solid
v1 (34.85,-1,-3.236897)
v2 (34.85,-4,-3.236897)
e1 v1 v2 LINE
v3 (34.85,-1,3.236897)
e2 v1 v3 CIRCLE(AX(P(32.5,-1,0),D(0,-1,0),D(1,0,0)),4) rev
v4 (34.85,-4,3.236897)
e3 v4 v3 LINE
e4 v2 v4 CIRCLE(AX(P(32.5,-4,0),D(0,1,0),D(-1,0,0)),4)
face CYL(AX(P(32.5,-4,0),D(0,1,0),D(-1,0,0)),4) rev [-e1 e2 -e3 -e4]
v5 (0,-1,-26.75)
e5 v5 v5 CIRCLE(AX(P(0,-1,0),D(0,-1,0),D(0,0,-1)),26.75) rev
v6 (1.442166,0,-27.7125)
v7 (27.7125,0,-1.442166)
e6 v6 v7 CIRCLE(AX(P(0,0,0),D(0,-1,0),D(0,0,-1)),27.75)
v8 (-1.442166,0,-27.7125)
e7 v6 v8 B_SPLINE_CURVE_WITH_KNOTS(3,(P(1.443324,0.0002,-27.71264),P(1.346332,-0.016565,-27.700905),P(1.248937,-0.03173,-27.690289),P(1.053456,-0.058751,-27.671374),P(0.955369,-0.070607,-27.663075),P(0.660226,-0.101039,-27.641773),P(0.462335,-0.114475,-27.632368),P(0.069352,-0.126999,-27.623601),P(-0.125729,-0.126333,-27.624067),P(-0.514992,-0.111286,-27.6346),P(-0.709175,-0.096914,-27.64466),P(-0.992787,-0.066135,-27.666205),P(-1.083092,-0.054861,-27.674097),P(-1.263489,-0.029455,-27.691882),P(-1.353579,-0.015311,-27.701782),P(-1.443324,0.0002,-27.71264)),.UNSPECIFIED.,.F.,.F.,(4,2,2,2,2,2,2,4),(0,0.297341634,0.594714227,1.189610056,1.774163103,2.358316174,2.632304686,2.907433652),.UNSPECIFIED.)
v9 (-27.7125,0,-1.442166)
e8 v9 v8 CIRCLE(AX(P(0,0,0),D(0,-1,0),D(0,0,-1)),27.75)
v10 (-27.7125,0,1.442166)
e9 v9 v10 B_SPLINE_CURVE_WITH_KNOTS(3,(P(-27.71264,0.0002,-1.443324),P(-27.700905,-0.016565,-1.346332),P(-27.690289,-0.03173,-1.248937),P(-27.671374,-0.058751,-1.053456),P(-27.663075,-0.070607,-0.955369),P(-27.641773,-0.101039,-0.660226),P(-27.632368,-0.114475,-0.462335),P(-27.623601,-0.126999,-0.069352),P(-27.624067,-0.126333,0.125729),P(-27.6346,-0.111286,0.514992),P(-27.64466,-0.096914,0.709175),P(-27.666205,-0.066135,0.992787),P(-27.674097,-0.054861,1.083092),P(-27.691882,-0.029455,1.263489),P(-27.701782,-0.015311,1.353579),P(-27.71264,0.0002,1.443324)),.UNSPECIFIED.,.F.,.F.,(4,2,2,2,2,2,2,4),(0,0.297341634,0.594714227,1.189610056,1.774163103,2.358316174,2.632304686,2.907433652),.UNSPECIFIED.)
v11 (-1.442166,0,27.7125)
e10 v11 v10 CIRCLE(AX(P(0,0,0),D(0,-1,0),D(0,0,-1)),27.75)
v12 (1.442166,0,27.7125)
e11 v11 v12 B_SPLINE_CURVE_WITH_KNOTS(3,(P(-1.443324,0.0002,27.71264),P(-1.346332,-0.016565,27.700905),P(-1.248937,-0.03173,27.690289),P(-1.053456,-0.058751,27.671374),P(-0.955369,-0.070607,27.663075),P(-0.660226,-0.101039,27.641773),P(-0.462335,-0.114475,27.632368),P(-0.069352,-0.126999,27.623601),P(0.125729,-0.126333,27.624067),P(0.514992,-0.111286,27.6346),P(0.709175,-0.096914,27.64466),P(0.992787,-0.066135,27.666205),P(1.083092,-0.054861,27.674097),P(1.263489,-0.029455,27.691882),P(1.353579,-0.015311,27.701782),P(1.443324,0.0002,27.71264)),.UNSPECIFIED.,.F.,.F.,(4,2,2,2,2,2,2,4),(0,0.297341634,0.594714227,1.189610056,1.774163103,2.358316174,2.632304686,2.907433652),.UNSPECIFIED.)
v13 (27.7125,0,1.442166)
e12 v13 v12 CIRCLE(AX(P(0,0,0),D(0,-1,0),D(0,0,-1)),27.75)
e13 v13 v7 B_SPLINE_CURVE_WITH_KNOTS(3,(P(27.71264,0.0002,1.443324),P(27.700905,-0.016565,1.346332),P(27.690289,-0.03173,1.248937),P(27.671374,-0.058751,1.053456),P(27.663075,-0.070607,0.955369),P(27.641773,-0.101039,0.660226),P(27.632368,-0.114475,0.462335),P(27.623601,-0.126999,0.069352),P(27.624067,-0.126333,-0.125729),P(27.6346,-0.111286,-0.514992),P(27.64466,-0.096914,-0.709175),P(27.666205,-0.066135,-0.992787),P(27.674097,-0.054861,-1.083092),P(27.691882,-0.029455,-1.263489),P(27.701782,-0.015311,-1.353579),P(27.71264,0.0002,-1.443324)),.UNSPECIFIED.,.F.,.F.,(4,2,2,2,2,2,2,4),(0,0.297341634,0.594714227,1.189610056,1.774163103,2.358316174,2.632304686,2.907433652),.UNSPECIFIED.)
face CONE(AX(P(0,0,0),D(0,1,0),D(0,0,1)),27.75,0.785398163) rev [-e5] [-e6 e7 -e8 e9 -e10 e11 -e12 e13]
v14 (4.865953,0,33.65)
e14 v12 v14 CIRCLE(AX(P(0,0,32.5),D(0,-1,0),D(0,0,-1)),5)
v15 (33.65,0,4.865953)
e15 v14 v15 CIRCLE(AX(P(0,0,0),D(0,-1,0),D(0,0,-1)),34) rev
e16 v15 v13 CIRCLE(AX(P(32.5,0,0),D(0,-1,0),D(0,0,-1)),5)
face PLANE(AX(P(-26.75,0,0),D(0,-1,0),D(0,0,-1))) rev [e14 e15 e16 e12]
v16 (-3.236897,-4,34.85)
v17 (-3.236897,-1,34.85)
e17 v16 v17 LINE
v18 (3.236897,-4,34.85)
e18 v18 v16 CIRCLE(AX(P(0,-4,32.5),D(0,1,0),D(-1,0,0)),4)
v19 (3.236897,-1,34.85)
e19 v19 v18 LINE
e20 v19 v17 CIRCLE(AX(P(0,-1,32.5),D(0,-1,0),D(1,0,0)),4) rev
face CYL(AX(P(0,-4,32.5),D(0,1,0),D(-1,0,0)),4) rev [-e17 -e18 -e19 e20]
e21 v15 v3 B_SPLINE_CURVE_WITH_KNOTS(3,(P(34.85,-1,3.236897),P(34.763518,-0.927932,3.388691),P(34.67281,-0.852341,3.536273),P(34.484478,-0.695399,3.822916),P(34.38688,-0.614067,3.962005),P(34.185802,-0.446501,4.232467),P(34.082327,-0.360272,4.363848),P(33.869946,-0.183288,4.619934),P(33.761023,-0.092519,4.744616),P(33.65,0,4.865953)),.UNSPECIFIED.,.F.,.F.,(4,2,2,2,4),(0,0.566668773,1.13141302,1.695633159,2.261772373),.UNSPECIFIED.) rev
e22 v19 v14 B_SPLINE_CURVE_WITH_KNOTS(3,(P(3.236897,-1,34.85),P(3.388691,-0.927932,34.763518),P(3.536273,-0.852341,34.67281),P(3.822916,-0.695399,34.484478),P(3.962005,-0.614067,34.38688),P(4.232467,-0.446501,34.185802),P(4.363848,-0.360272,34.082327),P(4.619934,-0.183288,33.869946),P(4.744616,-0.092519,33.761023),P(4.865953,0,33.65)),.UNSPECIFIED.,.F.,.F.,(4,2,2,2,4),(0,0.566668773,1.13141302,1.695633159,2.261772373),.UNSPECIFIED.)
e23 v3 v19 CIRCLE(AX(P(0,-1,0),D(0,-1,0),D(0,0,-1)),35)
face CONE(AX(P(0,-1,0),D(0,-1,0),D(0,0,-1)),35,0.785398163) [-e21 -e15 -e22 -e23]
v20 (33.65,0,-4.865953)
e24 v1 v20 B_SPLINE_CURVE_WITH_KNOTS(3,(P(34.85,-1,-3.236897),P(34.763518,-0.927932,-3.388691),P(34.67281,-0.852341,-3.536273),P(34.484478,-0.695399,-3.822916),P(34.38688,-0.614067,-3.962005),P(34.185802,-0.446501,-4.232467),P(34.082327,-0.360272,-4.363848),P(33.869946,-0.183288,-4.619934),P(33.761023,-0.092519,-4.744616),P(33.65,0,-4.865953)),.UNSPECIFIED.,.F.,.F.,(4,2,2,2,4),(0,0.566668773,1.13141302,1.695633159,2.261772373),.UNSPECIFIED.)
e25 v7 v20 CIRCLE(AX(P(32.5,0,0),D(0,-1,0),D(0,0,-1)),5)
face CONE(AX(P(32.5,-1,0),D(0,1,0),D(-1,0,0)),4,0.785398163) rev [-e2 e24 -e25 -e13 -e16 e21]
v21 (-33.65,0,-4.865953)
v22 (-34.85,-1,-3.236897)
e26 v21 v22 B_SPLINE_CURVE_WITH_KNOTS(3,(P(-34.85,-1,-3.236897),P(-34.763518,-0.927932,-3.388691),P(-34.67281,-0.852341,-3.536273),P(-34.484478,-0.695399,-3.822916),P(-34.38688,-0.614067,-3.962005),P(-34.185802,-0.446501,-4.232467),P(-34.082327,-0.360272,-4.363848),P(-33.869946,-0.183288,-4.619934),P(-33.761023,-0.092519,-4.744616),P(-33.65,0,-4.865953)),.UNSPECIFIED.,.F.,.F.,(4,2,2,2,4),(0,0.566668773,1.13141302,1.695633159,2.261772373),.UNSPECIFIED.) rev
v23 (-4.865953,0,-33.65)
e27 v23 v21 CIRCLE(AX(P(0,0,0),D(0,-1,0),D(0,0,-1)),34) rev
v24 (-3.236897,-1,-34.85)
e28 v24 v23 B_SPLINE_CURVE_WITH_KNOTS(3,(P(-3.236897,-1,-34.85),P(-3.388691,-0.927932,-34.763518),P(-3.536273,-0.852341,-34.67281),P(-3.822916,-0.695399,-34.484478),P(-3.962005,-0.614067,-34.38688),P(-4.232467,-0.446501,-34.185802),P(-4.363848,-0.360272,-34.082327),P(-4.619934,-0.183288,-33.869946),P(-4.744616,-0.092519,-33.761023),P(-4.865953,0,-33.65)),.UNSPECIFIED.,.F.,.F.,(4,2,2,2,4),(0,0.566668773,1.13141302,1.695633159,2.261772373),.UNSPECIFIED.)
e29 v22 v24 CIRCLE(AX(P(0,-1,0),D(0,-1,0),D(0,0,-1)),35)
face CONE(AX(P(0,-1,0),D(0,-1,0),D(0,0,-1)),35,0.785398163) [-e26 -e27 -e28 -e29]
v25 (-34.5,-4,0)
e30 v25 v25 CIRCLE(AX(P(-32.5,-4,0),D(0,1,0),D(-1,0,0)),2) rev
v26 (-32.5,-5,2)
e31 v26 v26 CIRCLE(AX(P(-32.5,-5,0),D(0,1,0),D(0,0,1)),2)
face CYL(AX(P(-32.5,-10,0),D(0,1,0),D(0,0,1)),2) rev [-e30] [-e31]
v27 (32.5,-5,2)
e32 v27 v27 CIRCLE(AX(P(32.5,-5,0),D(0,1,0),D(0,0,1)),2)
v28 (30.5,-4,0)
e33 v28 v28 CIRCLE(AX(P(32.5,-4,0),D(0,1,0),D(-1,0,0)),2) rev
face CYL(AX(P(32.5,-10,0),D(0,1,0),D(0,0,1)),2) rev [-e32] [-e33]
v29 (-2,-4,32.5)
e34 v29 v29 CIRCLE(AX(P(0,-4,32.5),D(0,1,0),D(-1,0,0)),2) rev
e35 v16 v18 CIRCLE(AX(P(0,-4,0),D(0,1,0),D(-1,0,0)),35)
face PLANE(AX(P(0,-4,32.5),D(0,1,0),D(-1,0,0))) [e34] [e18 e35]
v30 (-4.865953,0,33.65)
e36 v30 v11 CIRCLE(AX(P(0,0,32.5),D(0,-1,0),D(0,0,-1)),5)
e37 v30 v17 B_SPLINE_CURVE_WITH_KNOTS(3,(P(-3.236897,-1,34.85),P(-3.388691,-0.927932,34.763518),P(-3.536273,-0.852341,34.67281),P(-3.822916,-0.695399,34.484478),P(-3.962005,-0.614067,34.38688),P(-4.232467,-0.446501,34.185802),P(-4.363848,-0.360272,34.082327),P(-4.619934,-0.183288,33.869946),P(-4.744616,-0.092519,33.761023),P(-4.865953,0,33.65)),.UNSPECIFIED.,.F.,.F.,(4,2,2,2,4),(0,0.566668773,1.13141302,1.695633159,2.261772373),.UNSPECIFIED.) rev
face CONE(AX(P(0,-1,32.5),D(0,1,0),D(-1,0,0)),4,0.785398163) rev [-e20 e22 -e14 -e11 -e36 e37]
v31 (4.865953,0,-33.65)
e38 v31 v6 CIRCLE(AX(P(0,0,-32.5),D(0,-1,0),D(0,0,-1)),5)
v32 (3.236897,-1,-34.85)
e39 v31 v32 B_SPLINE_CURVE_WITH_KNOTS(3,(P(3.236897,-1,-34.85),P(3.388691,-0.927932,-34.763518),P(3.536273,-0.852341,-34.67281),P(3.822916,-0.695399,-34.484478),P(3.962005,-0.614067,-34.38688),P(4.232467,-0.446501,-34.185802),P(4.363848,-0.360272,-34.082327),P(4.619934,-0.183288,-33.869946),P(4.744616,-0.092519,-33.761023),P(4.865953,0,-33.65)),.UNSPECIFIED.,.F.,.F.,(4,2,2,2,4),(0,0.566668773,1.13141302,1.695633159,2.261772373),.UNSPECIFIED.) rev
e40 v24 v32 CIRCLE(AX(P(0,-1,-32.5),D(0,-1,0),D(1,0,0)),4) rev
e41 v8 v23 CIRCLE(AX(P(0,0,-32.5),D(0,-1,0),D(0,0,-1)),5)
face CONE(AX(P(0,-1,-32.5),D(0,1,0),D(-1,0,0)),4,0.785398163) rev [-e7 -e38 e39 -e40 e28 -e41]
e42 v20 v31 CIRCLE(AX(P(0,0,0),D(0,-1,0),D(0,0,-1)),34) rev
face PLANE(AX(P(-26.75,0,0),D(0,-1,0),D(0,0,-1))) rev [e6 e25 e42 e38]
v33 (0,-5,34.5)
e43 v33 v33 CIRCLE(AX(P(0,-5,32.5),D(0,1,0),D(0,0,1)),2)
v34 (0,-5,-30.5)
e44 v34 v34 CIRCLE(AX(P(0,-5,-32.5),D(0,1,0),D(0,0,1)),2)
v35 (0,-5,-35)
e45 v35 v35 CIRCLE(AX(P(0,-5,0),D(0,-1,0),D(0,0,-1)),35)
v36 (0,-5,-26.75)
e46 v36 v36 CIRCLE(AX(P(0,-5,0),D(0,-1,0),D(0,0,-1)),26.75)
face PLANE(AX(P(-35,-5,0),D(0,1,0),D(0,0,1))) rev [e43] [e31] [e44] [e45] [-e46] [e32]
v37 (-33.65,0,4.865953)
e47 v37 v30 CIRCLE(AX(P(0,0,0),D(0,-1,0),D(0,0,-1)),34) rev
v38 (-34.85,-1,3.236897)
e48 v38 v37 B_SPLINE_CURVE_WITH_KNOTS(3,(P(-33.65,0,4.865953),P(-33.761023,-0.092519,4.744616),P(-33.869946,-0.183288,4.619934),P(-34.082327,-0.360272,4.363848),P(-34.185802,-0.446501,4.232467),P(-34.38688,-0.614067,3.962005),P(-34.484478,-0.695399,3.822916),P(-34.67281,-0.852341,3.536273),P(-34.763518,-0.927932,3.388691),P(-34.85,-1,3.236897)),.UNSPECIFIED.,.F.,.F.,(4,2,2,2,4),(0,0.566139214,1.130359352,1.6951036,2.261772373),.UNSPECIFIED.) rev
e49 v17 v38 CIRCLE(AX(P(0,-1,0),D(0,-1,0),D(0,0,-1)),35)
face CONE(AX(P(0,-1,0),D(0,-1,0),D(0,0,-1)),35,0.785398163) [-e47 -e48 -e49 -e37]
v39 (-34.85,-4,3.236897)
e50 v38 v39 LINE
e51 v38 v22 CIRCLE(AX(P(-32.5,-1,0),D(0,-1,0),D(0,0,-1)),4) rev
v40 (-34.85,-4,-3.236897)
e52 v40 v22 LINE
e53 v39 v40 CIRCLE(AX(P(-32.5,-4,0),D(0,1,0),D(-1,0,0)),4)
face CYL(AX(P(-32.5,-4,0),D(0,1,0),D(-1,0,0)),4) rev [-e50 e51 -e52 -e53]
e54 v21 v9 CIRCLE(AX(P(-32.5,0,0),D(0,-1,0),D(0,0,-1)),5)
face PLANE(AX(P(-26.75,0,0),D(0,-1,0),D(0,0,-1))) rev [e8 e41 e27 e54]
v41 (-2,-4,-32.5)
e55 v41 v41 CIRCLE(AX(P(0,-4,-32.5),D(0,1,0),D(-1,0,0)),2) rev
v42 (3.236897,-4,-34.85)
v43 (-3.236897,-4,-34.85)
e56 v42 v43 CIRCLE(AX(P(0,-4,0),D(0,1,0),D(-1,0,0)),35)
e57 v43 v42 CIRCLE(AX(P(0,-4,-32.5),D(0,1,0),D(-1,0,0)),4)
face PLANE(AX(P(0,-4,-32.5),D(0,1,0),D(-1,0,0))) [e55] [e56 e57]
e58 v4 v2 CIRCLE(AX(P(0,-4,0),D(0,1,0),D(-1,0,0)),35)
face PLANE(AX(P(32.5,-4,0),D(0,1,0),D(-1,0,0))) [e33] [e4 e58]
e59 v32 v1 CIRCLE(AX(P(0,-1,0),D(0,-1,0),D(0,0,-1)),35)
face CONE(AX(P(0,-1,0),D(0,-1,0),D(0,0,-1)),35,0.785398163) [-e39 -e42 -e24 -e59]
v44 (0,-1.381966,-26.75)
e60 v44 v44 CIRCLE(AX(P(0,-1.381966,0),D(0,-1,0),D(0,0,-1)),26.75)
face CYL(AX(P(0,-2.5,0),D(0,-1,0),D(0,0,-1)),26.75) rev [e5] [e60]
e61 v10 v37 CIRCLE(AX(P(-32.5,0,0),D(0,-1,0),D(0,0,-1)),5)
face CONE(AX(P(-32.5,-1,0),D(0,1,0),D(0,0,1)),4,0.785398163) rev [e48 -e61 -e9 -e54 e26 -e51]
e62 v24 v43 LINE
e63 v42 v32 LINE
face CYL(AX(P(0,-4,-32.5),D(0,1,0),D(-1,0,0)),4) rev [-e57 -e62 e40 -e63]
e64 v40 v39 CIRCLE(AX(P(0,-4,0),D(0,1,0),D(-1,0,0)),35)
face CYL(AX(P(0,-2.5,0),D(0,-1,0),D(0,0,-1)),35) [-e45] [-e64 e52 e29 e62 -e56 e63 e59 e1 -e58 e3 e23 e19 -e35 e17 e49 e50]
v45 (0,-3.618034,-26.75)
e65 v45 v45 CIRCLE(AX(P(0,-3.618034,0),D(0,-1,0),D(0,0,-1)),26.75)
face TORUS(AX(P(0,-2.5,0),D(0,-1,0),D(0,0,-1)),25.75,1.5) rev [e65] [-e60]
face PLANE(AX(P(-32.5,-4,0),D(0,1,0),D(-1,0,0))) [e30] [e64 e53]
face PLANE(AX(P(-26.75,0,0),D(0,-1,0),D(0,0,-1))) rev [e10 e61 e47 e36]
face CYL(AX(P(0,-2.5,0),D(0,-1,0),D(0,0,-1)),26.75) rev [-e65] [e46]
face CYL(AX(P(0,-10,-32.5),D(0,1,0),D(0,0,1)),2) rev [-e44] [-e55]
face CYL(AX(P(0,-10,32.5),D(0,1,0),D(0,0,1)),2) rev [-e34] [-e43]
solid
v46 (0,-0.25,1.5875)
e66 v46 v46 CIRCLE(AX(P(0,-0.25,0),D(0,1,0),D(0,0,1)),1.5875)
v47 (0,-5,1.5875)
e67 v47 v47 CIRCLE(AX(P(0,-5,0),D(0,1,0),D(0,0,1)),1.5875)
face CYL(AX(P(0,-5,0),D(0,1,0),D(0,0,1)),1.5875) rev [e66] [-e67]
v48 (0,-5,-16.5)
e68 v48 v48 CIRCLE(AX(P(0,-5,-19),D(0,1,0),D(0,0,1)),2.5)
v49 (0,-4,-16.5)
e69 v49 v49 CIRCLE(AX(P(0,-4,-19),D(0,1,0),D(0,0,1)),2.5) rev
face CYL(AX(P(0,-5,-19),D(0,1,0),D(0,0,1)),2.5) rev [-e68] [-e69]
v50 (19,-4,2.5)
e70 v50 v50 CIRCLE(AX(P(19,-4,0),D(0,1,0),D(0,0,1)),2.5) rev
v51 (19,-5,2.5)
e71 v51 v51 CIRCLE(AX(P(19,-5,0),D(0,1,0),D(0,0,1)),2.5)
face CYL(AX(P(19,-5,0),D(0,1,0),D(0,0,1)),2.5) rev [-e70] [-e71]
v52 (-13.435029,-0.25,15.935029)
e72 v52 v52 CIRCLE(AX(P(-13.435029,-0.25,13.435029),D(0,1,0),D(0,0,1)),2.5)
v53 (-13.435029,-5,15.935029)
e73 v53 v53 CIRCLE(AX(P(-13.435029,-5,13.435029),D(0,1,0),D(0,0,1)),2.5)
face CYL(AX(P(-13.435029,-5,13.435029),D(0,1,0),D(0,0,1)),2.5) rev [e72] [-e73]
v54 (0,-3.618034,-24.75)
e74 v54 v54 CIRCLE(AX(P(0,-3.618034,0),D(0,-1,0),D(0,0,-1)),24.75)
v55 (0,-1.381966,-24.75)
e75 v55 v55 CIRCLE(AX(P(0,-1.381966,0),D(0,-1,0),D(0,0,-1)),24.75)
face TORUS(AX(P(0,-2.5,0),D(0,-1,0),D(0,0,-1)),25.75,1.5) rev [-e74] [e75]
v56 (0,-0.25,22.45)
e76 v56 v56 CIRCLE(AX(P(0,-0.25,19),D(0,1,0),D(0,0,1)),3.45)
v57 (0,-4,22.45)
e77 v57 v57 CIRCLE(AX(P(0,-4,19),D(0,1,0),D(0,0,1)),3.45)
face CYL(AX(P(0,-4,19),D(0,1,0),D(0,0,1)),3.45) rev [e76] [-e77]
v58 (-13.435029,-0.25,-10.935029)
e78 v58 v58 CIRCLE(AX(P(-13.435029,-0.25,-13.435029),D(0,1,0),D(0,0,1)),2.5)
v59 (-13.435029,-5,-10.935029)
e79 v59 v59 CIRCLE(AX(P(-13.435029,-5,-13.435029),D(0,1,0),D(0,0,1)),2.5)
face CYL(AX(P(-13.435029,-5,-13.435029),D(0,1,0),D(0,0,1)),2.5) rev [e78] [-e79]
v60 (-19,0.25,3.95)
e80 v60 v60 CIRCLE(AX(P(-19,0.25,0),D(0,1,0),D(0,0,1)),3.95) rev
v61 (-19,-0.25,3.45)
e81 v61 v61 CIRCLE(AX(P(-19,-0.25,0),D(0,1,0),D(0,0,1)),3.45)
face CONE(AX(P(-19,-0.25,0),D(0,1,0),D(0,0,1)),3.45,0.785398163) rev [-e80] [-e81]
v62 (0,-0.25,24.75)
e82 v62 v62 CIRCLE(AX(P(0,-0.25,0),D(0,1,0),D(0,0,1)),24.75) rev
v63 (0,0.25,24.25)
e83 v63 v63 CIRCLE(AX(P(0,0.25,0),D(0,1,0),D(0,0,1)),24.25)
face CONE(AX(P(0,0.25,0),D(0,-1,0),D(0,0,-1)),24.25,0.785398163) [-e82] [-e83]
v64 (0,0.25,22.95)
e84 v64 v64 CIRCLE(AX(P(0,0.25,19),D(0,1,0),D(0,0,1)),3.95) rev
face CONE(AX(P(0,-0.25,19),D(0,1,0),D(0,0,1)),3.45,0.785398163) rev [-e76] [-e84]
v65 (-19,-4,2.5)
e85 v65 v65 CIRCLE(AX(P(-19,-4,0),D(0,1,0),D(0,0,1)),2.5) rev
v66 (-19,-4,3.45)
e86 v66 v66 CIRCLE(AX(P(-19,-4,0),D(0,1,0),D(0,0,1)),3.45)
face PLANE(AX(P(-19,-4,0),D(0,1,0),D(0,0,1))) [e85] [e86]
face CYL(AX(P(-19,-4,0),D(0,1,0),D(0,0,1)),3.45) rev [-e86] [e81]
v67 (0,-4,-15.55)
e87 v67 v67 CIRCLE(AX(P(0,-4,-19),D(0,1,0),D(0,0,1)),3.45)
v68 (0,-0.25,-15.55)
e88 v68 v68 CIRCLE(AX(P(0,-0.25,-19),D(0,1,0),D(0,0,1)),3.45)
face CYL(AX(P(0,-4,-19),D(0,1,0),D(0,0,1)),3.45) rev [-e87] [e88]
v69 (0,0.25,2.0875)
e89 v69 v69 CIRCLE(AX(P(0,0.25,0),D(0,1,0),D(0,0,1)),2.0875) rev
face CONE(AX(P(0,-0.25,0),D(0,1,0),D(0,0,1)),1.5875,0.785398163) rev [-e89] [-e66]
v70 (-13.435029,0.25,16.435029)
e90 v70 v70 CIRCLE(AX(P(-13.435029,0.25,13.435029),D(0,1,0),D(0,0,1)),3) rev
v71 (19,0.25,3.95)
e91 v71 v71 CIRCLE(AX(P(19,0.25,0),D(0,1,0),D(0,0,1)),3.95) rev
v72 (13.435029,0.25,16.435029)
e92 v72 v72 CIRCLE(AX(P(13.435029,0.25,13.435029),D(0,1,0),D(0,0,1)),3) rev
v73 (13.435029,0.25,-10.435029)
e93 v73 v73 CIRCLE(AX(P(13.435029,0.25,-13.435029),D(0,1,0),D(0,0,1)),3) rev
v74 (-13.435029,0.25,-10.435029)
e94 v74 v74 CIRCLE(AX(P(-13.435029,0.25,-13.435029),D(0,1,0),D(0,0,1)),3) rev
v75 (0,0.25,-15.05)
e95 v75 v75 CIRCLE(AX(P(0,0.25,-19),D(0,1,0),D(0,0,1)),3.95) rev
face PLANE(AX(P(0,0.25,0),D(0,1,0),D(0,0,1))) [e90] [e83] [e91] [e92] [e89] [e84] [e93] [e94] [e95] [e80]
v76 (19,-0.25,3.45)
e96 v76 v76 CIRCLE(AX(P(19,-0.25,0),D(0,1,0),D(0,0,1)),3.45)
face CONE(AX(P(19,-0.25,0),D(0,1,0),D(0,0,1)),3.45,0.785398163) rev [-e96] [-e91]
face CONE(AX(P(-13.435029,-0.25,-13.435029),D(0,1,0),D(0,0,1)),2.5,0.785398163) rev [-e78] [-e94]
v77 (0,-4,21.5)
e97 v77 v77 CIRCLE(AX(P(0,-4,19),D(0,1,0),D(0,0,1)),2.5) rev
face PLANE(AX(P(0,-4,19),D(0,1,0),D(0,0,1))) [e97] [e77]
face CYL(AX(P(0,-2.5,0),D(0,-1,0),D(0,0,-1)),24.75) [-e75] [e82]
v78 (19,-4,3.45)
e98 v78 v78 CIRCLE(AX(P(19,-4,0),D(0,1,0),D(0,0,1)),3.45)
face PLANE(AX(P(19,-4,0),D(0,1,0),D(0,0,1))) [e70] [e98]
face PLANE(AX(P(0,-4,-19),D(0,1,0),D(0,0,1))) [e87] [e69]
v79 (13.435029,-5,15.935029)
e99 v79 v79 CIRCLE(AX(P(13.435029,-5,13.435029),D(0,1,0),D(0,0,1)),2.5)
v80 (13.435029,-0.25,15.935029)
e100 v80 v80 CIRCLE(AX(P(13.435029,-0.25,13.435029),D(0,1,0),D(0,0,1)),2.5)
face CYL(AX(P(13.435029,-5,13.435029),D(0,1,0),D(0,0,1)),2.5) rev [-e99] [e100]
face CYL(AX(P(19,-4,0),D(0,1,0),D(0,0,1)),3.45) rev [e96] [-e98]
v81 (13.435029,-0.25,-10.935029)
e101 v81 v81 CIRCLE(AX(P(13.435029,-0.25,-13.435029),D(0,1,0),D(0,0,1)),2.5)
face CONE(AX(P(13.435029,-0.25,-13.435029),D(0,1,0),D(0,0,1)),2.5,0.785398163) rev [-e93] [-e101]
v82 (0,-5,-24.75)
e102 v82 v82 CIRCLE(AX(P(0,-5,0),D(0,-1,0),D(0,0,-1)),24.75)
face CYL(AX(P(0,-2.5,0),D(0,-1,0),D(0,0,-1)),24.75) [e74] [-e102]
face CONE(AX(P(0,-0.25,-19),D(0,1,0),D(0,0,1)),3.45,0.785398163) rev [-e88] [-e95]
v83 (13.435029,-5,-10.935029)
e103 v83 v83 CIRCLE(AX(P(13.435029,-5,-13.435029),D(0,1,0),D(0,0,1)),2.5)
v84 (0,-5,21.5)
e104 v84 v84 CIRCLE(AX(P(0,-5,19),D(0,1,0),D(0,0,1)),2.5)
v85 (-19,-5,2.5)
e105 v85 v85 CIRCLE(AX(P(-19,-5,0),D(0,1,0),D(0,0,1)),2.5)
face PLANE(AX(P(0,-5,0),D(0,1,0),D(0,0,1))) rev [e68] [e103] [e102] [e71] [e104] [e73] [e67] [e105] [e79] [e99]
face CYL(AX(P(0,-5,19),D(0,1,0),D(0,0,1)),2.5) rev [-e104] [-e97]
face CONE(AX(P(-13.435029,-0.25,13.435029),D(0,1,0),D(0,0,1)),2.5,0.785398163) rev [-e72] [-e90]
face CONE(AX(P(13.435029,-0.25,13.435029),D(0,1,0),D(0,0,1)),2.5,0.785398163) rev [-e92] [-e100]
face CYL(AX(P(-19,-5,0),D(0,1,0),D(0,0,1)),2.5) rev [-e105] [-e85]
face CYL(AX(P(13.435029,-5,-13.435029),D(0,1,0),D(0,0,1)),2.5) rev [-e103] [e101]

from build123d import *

# Parameters (mm, degrees)
SKETCH2_R           = 23.75
SKETCH2_R_2         = 2.5
SKETCH2_R_3         = 1.5875
BOSS_EXTRUDE2_DEPTH = 5
SKETCH3_R           = 3.45
CUT_EXTRUDE1_DEPTH  = 4
SKETCH5_R           = 2
CUT_EXTRUDE2_DEPTH  = 10
SKETCH6_R           = 4
CUT_EXTRUDE3_DEPTH  = 4
CHAMFER2_SIZE       = 1
SKETCH7_R           = 24.75
SKETCH7_R_2         = 2.5
SKETCH7_R_3         = 1.5875
SKETCH7_R_4         = 3.45
BOSS_EXTRUDE3_DEPTH = 0.25
CHAMFER3_SIZE       = 0.5


with BuildPart() as part:
    # Sketch2 → Boss-Extrude2 (new body)
    with BuildSketch(Plane(origin=(0, 0, 0), x_dir=(-1, 0, 0), z_dir=(0, 1, 0))):
        with Locations(Location((0, 0, 0), (0, 0, 90))):
            Circle(SKETCH2_R)
        with Locations(Location((-13.435028843, 13.435028843, 0), (0, 0, 90))):
            Circle(SKETCH2_R_2, mode=Mode.SUBTRACT)
        with Locations(Location((13.435028843, 13.435028843, 0), (0, 0, 90))):
            Circle(SKETCH2_R_2, mode=Mode.SUBTRACT)
        with Locations(Location((0, 0, 0), (0, 0, 90))):
            Circle(SKETCH2_R_3, mode=Mode.SUBTRACT)
        with Locations(Location((13.435028843, -13.435028843, 0), (0, 0, 90))):
            Circle(SKETCH2_R_2, mode=Mode.SUBTRACT)
        with Locations(Location((0, 19, 0), (0, 0, 90))):
            Circle(SKETCH2_R_2, mode=Mode.SUBTRACT)
        with Locations(Location((19, 0, 0), (0, 0, 90))):
            Circle(SKETCH2_R_2, mode=Mode.SUBTRACT)
        with Locations(Location((0, -19, 0), (0, 0, 90))):
            Circle(SKETCH2_R_2, mode=Mode.SUBTRACT)
        with Locations(Location((-19, 0, 0), (0, 0, 90))):
            Circle(SKETCH2_R_2, mode=Mode.SUBTRACT)
        with Locations(Location((-13.435028843, -13.435028843, 0), (0, 0, 90))):
            Circle(SKETCH2_R_2, mode=Mode.SUBTRACT)
    extrude(amount=-BOSS_EXTRUDE2_DEPTH)

    # Sketch3 → Cut-Extrude1 (cut)
    with BuildSketch(Plane(origin=(0, 0, 0), x_dir=(1, 0, 0), z_dir=(0, 1, 0))):
        with Locations(Location((0, 19, 0), (0, 0, 270))):
            Circle(SKETCH3_R)
        with Locations(Location((19, 0, 0), (0, 0, 270))):
            Circle(SKETCH3_R)
        with Locations(Location((0, -19, 0), (0, 0, 270))):
            Circle(SKETCH3_R)
        with Locations(Location((-19, 0, 0), (0, 0, 270))):
            Circle(SKETCH3_R)
    extrude(amount=-CUT_EXTRUDE1_DEPTH, mode=Mode.SUBTRACT)

    # Sketch4 → Revolve1 (revolve)
    with BuildSketch(Plane.XY, mode=Mode.PRIVATE) as revolve1_sk:
        with BuildLine():
            Line((-24.75, 0), (-23.75, 0))
            Line((-23.75, 0), (-23.75, -5))
            Line((-23.75, -5), (-24.75, -5))
            Line((-24.75, -5), (-24.75, -3.618033989))
            ThreePointArc((-24.75, -3.618033989), (-24.25, -2.5), (-24.75, -1.381966011))
            Line((-24.75, -1.381966011), (-24.75, 0))
        make_face()
        with BuildLine():
            Line((-26.75, -5), (-26.75, -3.618033989))
            ThreePointArc((-26.75, -3.618033989), (-27.25, -2.5), (-26.75, -1.381966011))
            Line((-26.75, -1.381966011), (-26.75, 0))
            Line((-26.75, 0), (-35, 0))
            Line((-35, 0), (-35, -5))
            Line((-35, -5), (-26.75, -5))
        make_face()
    revolve(revolve1_sk.sketch.rotate(Axis((0, -2.5, 0), (0, 1, 0)), 270), axis=Axis((0, -2.5, 0), (0, 1, 0)))


with BuildPart() as revolve1_piece_1:
    # of the separate pieces the step leaves, piece 1, a body of its own (revolve1_pieces)
    add(part.part.solids().sort_by_distance((13.435028843, 0, -10.935028843))[0])

    # Sketch7 → Boss-Extrude3 (add)
    with BuildSketch(Plane(origin=(0, 0, 0), x_dir=(1, 0, 0), z_dir=(0, 1, 0))):
        with Locations(Location((0, 0, 0), (0, 0, 90))):
            Circle(SKETCH7_R)
        with Locations(Location((13.435028843, 13.435028843, 0), (0, 0, 270))):
            Circle(SKETCH7_R_2, mode=Mode.SUBTRACT)
        with Locations(Location((-13.435028843, 13.435028843, 0), (0, 0, 270))):
            Circle(SKETCH7_R_2, mode=Mode.SUBTRACT)
        with Locations(Location((0, 0, 0), (0, 0, 270))):
            Circle(SKETCH7_R_3, mode=Mode.SUBTRACT)
        with Locations(Location((-13.435028843, -13.435028843, 0), (0, 0, 270))):
            Circle(SKETCH7_R_2, mode=Mode.SUBTRACT)
        with Locations(Location((13.435028843, -13.435028843, 0), (0, 0, 270))):
            Circle(SKETCH7_R_2, mode=Mode.SUBTRACT)
        with Locations(Location((-19, 0, 0), (0, 0, 270))):
            Circle(SKETCH7_R_4, mode=Mode.SUBTRACT)
        with Locations(Location((0, -19, 0), (0, 0, 270))):
            Circle(SKETCH7_R_4, mode=Mode.SUBTRACT)
        with Locations(Location((19, 0, 0), (0, 0, 270))):
            Circle(SKETCH7_R_4, mode=Mode.SUBTRACT)
        with Locations(Location((0, 19, 0), (0, 0, 270))):
            Circle(SKETCH7_R_4, mode=Mode.SUBTRACT)
    extrude(amount=BOSS_EXTRUDE3_DEPTH)

    # Chamfer3
    chamfer3_edges = [revolve1_piece_1.edges().sort_by_distance(p)[0] for p in [
        (0, 0.25, 24.75),
        (13.435028843, 0.25, -15.935028843),
        (-13.435028843, 0.25, -15.935028843),
        (0, 0.25, -1.5875),
        (-13.435028843, 0.25, 10.935028843),
        (13.435028843, 0.25, 10.935028843),
        (-19, 0.25, -3.45),
        (0, 0.25, 15.55),
        (19, 0.25, -3.45),
        (0, 0.25, -22.45),
    ]]
    chamfer(chamfer3_edges, length=CHAMFER3_SIZE)


with BuildPart() as revolve1_piece_2:
    # of the separate pieces the step leaves, piece 2, a body of its own (revolve1_pieces)
    add(part.part.solids().sort_by_distance((0, -5, -26.75))[0])

    # Sketch5 → Cut-Extrude2 (cut)
    with BuildSketch(Plane(origin=(0, 0, 0), x_dir=(1, 0, 0), z_dir=(0, 1, 0))):
        with Locations(Location((0, 32.5, 0), (0, 0, 270))):
            Circle(SKETCH5_R)
        with Locations(Location((32.5, 0, 0), (0, 0, 270))):
            Circle(SKETCH5_R)
        with Locations(Location((0, -32.5, 0), (0, 0, 270))):
            Circle(SKETCH5_R)
        with Locations(Location((-32.5, 0, 0), (0, 0, 270))):
            Circle(SKETCH5_R)
    extrude(amount=-CUT_EXTRUDE2_DEPTH, mode=Mode.SUBTRACT)

    # Sketch6 → Cut-Extrude3 (cut)
    with BuildSketch(Plane(origin=(0, 0, 0), x_dir=(1, 0, 0), z_dir=(0, 1, 0))):
        with Locations((0, -32.5)):
            Circle(SKETCH6_R)
        with Locations((-32.5, 0)):
            Circle(SKETCH6_R)
        with Locations((0, 32.5)):
            Circle(SKETCH6_R)
        with Locations((32.5, 0)):
            Circle(SKETCH6_R)
    extrude(amount=-CUT_EXTRUDE3_DEPTH, mode=Mode.SUBTRACT)

    # Chamfer2
    # the kernel refuses this chamfer: 1 mm, written as the material it takes off along each edge
    with BuildSketch(Plane(origin=(0, 0, 0), x_dir=(0.019114321981189532, 0, 0.9998173046588058), z_dir=(-0.9998173046588058, 0, 0.019114321981189532))) as chamfer2_piece_1:
        Polygon((35 - CHAMFER2_SIZE, 0), (35, -CHAMFER2_SIZE), (35, 0), align=None)
    revolve(axis=Axis((0, 0, 0), (0, 1, 0)), revolution_arc=87.809526646, mode=Mode.SUBTRACT)
    with BuildSketch(Plane(origin=(0, 0, 0), x_dir=(-0.9998173046588067, 0, 0.019114321981147413), z_dir=(-0.019114321981147413, 0, -0.9998173046588067))) as chamfer2_piece_2:
        Polygon((35 - CHAMFER2_SIZE, 0), (35, -CHAMFER2_SIZE), (35, 0), align=None)
    revolve(axis=Axis((0, 0, 0), (0, 1, 0)), revolution_arc=87.809526646, mode=Mode.SUBTRACT)
    with BuildSketch(Plane(origin=(0, 0, 0), x_dir=(-0.019114321981182705, 0, -0.999817304658806), z_dir=(0.999817304658806, 0, -0.019114321981182705))) as chamfer2_piece_3:
        Polygon((35 - CHAMFER2_SIZE, 0), (35, -CHAMFER2_SIZE), (35, 0), align=None)
    revolve(axis=Axis((0, 0, 0), (0, 1, 0)), revolution_arc=87.809526646, mode=Mode.SUBTRACT)
    with BuildSketch(Plane(origin=(0, 0, 32.5), x_dir=(-0.29349569960602556, -1.3653955404004917e-15, 0.9559603936946184), z_dir=(0.9559603936946184, 1.4794691735989965e-15, 0.29349569960602556))) as chamfer2_piece_4:
        Polygon((4 + CHAMFER2_SIZE, 0), (4, CHAMFER2_SIZE), (4, 0), align=None)
    revolve(axis=Axis((0, 0, 32.5), (0, -1, 0)), revolution_arc=325.865290322, mode=Mode.SUBTRACT)
    with BuildSketch(Plane(origin=(-32.5, 0, 0), x_dir=(-0.9559603936947099, -1.386827160904714e-15, -0.2934956996057275), z_dir=(-0.2934956996057275, 7.472387430751279e-15, 0.9559603936947099))) as chamfer2_piece_5:
        Polygon((4 + CHAMFER2_SIZE, 0), (4, CHAMFER2_SIZE), (4, 0), align=None)
    revolve(axis=Axis((-32.5, 0, 0), (0, -1, 0)), revolution_arc=325.865290322, mode=Mode.SUBTRACT)
    with BuildSketch(Plane(origin=(0, 0, 0), x_dir=(0.9998173046588067, 0, -0.0191143219811504), z_dir=(0.0191143219811504, 0, 0.9998173046588067))) as chamfer2_piece_6:
        Polygon((35 - CHAMFER2_SIZE, 0), (35, -CHAMFER2_SIZE), (35, 0), align=None)
    revolve(axis=Axis((0, 0, 0), (0, 1, 0)), revolution_arc=87.809526646, mode=Mode.SUBTRACT)
    with BuildSketch(Plane(origin=(0, 0, -32.5), x_dir=(-0.29349569960600574, -1.3653955404004456e-15, -0.9559603936946244), z_dir=(0.9559603936946244, 1.4794691735989516e-15, -0.29349569960600574))) as chamfer2_piece_7:
        Polygon((4 + CHAMFER2_SIZE, 0), (4, -CHAMFER2_SIZE), (4, 0), align=None)
    revolve(axis=Axis((0, 0, -32.5), (0, 1, 0)), revolution_arc=325.865290322, mode=Mode.SUBTRACT)
    with BuildSketch(Plane(origin=(0, 0, 0), x_dir=(0, 0, -1), z_dir=(1, 0, 0))) as chamfer2_piece_8:
        Polygon((26.75, -CHAMFER2_SIZE), (26.75 + CHAMFER2_SIZE, 0), (26.75, 0), align=None)
    revolve(axis=Axis((0, 0, 0), (0, 1, 0)), mode=Mode.SUBTRACT)
    with BuildSketch(Plane(origin=(32.5, 0, 0), x_dir=(0.9559603936946928, 0, -0.2934956996057833), z_dir=(0.2934956996057833, 0, 0.9559603936946928))) as chamfer2_piece_9:
        Polygon((4 + CHAMFER2_SIZE, 0), (4, -CHAMFER2_SIZE), (4, 0), align=None)
    revolve(axis=Axis((32.5, 0, 0), (0, 1, 0)), revolution_arc=325.865290322, mode=Mode.SUBTRACT)


solid = Compound([revolve1_piece_1.part, revolve1_piece_2.part])
